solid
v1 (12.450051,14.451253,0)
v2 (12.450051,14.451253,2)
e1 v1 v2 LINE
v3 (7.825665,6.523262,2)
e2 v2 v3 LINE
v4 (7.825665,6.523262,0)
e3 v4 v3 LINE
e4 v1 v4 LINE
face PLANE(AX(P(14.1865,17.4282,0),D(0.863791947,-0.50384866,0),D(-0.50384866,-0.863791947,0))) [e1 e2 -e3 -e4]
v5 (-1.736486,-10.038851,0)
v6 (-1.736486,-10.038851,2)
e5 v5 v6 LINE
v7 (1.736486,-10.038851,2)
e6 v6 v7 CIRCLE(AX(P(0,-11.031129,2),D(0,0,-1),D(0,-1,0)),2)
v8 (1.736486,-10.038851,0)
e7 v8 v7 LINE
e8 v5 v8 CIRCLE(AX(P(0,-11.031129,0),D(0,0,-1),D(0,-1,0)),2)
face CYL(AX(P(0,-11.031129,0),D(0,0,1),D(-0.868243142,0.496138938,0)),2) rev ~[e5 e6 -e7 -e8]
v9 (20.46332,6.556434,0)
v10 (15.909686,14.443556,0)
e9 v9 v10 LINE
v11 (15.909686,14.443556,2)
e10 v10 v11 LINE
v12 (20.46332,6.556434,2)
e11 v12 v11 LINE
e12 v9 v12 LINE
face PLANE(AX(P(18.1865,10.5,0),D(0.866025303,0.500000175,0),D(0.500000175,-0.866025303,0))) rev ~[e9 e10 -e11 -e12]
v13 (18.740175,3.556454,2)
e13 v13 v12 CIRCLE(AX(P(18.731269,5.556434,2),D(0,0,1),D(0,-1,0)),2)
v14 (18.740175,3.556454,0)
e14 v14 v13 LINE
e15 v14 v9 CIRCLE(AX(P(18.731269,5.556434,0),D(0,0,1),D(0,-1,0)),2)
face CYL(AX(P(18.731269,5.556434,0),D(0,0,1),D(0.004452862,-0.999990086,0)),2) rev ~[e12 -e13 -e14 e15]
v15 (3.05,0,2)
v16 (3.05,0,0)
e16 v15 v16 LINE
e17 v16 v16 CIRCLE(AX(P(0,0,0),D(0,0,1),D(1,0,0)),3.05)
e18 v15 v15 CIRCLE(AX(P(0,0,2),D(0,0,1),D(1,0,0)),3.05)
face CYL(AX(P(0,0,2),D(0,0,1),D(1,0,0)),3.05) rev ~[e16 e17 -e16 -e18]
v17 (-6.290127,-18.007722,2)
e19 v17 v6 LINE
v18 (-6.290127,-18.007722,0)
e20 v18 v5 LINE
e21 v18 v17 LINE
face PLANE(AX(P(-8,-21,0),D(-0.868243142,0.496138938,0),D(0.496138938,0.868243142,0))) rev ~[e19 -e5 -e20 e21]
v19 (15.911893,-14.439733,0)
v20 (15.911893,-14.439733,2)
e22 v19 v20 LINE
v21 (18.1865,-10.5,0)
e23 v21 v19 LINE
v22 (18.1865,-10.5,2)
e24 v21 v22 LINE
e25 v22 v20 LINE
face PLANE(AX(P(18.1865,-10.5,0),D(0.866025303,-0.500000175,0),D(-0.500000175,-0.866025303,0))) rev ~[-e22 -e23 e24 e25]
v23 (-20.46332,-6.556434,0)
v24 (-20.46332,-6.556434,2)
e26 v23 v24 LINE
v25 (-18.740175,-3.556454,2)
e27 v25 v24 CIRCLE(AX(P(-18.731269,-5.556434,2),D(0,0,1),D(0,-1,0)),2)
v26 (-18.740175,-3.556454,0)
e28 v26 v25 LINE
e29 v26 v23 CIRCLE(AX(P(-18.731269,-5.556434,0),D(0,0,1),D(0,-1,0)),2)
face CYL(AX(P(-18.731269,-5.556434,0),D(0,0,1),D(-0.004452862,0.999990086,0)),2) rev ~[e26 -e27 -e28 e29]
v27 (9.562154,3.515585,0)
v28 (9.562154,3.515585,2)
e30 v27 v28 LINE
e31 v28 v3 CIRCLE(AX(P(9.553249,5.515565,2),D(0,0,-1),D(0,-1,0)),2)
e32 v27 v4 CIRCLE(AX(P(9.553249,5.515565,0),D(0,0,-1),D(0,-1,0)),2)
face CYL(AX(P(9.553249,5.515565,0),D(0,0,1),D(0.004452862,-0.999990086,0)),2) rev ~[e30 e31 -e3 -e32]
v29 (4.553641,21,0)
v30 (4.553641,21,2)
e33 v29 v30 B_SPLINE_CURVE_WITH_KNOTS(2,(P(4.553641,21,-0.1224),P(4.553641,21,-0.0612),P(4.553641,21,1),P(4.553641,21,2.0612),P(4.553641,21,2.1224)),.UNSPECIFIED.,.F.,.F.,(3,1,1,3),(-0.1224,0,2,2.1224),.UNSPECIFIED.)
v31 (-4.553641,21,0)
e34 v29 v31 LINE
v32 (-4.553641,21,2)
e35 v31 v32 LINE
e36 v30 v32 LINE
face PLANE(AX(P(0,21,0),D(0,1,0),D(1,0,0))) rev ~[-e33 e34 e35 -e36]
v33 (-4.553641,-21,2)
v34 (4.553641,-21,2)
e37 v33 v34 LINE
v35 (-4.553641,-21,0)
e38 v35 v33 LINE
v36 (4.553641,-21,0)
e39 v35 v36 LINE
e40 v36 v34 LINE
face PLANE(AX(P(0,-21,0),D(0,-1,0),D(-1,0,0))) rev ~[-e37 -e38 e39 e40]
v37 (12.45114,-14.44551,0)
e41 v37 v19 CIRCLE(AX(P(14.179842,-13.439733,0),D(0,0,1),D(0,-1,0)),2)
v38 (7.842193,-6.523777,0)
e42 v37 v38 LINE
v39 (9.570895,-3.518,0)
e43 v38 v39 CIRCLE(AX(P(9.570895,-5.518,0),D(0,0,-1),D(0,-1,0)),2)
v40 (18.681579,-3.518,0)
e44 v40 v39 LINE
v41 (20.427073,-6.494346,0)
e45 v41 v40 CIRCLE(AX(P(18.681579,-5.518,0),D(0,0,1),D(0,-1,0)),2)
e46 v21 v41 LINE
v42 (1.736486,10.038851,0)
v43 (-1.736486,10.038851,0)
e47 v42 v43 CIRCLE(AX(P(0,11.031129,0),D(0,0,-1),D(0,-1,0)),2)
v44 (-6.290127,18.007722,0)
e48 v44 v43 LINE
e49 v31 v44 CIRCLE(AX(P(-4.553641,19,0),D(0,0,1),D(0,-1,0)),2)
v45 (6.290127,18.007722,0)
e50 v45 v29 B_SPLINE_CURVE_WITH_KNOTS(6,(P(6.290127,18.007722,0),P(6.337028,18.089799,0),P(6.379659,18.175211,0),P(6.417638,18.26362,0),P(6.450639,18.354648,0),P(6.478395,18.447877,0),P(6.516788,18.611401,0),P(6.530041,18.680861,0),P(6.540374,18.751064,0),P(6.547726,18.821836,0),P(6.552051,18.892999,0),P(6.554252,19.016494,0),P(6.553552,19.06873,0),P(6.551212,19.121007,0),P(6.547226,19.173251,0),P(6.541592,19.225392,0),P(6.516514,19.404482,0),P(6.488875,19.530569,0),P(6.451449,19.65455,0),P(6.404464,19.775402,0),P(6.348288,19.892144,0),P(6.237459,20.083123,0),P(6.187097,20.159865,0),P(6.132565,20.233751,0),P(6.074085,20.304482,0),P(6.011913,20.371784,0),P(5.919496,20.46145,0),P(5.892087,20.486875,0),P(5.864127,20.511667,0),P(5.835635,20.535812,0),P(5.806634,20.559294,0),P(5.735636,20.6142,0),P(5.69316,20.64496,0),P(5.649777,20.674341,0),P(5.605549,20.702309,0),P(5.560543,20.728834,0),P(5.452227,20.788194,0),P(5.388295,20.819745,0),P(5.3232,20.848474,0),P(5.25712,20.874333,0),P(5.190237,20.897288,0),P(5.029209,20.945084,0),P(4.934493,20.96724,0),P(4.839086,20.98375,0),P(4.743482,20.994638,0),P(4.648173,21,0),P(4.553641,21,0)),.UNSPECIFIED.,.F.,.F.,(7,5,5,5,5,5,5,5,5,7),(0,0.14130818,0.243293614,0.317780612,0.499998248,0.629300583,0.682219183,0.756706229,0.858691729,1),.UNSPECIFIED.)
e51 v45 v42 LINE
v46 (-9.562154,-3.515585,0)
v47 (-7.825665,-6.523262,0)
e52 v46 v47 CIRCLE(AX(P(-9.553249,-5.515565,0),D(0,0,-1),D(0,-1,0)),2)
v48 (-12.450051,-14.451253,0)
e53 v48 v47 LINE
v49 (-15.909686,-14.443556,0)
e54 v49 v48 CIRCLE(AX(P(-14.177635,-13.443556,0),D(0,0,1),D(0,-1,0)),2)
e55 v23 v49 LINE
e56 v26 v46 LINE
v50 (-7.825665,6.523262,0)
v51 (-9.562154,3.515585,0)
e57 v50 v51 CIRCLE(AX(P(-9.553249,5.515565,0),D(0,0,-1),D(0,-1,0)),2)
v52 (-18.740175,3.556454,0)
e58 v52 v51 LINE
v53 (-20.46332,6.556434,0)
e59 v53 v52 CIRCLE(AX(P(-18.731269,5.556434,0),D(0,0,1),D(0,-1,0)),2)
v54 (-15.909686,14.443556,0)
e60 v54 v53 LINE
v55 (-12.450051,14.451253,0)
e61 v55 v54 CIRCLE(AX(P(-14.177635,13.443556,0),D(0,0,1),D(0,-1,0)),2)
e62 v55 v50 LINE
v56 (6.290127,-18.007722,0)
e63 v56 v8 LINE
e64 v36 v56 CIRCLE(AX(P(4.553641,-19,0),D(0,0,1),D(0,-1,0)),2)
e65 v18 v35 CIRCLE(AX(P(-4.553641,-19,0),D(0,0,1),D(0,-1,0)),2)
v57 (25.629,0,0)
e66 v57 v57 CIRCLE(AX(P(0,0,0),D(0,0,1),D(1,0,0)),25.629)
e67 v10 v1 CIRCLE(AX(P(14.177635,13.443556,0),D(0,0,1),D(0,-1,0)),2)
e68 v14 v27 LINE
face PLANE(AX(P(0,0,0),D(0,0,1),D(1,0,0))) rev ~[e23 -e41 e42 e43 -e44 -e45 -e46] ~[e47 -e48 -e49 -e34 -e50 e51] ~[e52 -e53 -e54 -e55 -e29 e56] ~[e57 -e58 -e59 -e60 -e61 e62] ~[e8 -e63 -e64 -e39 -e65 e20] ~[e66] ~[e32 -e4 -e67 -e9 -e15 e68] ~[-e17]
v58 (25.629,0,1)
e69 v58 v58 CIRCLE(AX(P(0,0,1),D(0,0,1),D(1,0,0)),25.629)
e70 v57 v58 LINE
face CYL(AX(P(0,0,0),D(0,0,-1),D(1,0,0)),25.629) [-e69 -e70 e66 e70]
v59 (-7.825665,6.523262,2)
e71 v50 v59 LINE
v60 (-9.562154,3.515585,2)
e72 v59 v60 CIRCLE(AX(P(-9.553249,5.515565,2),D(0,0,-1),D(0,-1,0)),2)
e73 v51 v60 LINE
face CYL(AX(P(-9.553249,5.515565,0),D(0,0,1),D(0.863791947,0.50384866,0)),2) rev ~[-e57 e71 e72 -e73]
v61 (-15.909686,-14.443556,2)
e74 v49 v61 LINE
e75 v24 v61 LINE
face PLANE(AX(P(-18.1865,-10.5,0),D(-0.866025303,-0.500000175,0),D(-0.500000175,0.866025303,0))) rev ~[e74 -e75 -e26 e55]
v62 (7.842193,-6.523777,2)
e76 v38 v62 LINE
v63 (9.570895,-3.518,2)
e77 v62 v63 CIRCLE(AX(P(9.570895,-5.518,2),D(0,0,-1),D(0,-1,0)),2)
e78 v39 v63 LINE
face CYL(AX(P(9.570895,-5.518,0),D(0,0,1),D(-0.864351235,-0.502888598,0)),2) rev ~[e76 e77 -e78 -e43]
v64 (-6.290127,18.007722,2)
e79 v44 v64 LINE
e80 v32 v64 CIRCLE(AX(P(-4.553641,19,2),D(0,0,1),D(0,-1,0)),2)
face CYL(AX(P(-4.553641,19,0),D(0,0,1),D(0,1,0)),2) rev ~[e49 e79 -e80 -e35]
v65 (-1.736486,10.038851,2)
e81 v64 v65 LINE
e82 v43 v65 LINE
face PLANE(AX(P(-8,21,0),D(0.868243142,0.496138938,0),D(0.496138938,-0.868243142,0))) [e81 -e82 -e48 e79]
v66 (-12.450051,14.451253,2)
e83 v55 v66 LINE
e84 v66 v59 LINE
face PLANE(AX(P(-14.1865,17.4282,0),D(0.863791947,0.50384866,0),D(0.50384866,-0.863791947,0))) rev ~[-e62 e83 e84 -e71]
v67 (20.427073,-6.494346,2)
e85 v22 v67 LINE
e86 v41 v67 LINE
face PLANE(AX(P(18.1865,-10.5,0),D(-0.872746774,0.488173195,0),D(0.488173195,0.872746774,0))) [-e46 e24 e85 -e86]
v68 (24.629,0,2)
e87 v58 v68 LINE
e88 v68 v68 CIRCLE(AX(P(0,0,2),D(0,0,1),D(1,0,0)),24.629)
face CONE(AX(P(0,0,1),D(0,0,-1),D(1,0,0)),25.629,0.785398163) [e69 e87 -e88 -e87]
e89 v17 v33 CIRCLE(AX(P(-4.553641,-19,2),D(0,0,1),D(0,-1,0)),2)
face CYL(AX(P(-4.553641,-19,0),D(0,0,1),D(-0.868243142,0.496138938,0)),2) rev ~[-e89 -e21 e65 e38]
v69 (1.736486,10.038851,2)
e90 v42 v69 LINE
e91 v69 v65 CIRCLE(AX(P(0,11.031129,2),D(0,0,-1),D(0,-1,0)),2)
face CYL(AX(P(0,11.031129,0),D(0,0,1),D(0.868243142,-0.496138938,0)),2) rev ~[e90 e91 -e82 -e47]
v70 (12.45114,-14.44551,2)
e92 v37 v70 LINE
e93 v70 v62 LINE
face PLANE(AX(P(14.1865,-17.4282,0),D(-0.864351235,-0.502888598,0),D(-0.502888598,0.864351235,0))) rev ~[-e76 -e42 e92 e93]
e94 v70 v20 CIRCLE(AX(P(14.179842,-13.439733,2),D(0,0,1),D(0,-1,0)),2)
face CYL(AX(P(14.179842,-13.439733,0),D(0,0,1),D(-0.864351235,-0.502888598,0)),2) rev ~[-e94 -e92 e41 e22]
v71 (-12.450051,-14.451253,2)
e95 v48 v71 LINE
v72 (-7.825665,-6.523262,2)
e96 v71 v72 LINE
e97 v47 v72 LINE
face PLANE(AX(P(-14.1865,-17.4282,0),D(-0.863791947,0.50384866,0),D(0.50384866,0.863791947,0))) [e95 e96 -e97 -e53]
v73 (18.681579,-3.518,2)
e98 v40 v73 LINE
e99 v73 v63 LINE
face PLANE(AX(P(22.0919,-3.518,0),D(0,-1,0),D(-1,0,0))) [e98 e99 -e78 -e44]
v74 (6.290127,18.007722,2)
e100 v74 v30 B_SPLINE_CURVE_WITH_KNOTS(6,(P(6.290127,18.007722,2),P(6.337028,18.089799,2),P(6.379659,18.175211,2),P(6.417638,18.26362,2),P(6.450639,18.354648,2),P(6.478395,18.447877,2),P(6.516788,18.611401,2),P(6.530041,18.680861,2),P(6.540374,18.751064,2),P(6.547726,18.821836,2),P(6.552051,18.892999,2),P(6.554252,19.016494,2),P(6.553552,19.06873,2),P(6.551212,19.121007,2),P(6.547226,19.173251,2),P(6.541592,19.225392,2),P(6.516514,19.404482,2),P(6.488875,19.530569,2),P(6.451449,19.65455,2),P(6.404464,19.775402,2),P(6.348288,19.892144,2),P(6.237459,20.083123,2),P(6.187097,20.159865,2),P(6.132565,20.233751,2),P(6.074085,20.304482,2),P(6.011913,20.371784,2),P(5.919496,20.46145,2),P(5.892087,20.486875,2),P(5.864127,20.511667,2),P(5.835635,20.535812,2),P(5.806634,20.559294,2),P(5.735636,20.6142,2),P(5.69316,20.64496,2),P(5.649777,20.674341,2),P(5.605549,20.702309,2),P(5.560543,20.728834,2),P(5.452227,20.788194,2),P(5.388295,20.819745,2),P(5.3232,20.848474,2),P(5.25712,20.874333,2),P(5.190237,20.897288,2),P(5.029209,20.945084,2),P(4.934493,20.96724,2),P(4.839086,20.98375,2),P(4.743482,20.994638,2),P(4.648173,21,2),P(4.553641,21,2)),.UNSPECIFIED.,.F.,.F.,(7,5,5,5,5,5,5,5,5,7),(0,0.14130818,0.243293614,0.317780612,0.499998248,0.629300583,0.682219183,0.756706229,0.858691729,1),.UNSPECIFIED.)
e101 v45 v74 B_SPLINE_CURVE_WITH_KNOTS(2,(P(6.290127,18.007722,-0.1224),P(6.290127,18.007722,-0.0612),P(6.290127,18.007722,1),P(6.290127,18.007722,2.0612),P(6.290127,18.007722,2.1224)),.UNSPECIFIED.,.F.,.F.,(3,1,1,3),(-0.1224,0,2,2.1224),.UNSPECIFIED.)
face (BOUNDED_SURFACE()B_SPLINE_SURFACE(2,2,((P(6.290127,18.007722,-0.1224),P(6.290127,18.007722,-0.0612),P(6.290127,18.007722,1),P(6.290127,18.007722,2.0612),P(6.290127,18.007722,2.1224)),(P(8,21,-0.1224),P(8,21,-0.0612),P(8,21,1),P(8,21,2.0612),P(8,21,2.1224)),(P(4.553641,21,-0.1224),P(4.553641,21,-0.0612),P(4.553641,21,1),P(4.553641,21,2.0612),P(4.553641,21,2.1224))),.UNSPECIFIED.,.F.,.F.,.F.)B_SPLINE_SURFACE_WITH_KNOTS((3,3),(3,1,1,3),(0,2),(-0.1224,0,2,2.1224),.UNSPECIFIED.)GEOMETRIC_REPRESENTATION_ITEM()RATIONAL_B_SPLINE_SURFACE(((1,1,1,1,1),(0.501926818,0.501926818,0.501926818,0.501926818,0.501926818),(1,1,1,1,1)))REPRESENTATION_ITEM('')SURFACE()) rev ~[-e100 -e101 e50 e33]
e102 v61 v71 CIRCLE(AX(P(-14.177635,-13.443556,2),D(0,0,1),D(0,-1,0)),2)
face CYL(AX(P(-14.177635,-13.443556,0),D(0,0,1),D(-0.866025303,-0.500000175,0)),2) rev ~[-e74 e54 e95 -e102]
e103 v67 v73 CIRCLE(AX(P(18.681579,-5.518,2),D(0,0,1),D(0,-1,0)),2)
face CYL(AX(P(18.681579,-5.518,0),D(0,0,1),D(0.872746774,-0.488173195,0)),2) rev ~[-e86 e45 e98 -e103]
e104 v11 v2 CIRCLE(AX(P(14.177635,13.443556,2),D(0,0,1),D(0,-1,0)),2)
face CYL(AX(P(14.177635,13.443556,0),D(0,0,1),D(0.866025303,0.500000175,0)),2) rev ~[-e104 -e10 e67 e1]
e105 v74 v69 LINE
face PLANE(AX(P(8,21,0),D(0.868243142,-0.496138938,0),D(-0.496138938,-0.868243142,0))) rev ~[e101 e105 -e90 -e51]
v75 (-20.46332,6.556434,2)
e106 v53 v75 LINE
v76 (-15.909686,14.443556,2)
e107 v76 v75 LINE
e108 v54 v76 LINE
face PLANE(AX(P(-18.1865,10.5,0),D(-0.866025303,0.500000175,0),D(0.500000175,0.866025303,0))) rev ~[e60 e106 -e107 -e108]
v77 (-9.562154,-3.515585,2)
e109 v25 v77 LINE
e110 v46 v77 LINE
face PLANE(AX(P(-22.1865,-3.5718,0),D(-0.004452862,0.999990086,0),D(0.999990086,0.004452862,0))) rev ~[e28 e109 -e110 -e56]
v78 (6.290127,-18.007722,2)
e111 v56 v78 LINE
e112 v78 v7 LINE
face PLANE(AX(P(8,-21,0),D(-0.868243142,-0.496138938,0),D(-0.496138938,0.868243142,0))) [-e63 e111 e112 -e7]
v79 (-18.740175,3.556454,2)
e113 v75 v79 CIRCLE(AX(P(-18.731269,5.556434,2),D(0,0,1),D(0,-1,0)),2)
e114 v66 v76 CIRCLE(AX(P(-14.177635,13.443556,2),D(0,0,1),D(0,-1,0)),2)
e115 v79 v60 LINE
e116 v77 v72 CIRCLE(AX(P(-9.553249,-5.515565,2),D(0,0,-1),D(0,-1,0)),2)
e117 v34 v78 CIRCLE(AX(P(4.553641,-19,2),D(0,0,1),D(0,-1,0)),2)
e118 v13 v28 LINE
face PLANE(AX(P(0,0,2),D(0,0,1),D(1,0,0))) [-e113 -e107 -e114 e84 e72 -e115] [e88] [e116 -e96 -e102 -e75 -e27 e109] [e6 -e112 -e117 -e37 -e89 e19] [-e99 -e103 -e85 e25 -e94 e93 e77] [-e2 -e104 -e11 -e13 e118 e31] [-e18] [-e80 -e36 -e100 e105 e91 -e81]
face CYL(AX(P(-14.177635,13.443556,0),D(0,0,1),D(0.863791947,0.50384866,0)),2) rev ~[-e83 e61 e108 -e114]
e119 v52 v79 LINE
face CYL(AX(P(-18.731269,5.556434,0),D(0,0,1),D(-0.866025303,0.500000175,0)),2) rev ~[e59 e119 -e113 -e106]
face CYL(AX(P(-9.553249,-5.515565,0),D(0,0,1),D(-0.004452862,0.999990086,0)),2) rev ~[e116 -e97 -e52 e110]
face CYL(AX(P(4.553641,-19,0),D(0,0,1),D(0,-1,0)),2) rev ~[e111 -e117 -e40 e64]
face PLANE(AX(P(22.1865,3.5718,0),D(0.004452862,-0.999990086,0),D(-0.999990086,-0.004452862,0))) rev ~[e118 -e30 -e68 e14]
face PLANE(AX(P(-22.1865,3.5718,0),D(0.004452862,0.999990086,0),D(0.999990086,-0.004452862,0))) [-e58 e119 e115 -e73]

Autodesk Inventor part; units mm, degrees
sketch "Sketch1" plane through (0, 0, 0) normal (0, 0, 1) x (1, 0, 0)
  line L0 (0, 2.8582) -> (0, -2.8582) construction
  line L1 (-5.7775, 0) -> (5.7775, 0) construction
  circle A0 centre (0, 0) radius 25.629
  circle A1 centre (0, 0) radius 4
  line L2 (0, 4) -> (0, 7)
  line L3 (0, 7) -> (0, 21)
  line L4 (0, 21) -> (5, 21)
  line L5 (5, 21) -> (8, 21)
  line L6 (8, 21) -> (0, 7)
  line L7 (0, 21) -> (-8, 21)
  line L8 (-8, 21) -> (0, 7)
  line L9 (0, -4) -> (0, -7)
  line L10 (0, -7) -> (0, -21)
  line L11 (0, -21) -> (8, -21)
  line L12 (8, -21) -> (0, -7)
  line L13 (0, -21) -> (-8, -21)
  line L14 (-8, -21) -> (0, -7)
  line L15 (0, 0) -> (2.5981, 1.5)
  line L16 (0, 0) -> (3, 0) construction
  line L17 (2.5981, 1.5) -> (3.4641, 2)
  line L18 (3.4641, 2) -> (6.0622, 3.5)
  line L19 (6.0622, 3.5) -> (18.1865, 10.5)
  line L20 (18.1865, 10.5) -> (14.1865, 17.4282)
  line L21 (14.1865, 17.4282) -> (6.0622, 3.5)
  line L22 (18.1865, 10.5) -> (22.1865, 3.5718)
  line L23 (22.1865, 3.5718) -> (6.0622, 3.5)
  line L24 (0, 0) -> (8, 0) construction
  line L25 (0, 0) -> (3.4641, -2)
  line L26 (0, 0) -> (4, 0) construction
  line L27 (3.4641, -2) -> (6.0622, -3.5)
  line L28 (6.0622, -3.5) -> (18.1865, -10.5)
  line L29 (18.1865, -10.5) -> (14.1865, -17.4282)
  line L30 (14.1865, -17.4282) -> (6.0934, -3.518)
  line L31 (18.1865, -10.5) -> (22.0919, -3.518)
  line L32 (22.0919, -3.518) -> (6.0934, -3.518)
  line L33 (0, 0) -> (-2.5981, 1.5)
  line L34 (0, 0) -> (3, 0) construction
  line L35 (-2.5981, 1.5) -> (-3.4641, 2)
  line L36 (-3.4641, 2) -> (-6.0622, 3.5)
  line L37 (-6.0622, 3.5) -> (-18.1865, 10.5)
  line L38 (-18.1865, 10.5) -> (-14.1865, 17.4282)
  line L39 (-14.1865, 17.4282) -> (-6.0622, 3.5)
  line L40 (-18.1865, 10.5) -> (-22.1865, 3.5718)
  line L41 (-22.1865, 3.5718) -> (-6.0622, 3.5)
  line L42 (0, 0) -> (-6.0622, -3.5)
  line L43 (0, 0) -> (7, 0) construction
  line L44 (-6.0622, -3.5) -> (-18.1865, -10.5)
  line L45 (-18.1865, -10.5) -> (-14.1865, -17.4282)
  line L46 (-14.1865, -17.4282) -> (-6.0622, -3.5)
  line L47 (-18.1865, -10.5) -> (-22.1865, -3.5718)
  line L48 (-22.1865, -3.5718) -> (-6.0622, -3.5)
  dimension "d0" = 51.258
  dimension "d1" = 8
  dimension "d2" = 3
  dimension "d3" = 14
  dimension "d4" = 5
  dimension "d5" = 3
  dimension "d6" = 8
  dimension "d7" = 3
  dimension "d8" = 14
  dimension "d9" = 8
  dimension "d10" = 8
  dimension "d11" = 3
  dimension "d12" = 30
  dimension "d13" = 3
  dimension "d14" = 14
  dimension "d15" = 8
  dimension "d16" = 8
  dimension "d19" = 4
  dimension "d20" = 30
  dimension "d21" = 3
  dimension "d22" = 14
  dimension "d23" = 8
  dimension "d24" = 8
  dimension "d25" = 3
  dimension "d26" = 150
  dimension "d27" = 1
  dimension "d28" = 180
  dimension "d29" = 3
  dimension "d30" = 180
  dimension "d31" = 180
  dimension "d32" = 8
  dimension "d33" = 8
  dimension "d34" = 7
  dimension "d35" = 150
  dimension "d36" = 14
  dimension "d37" = 180
  dimension "d38" = 8
  dimension "d39" = 8
extrude "Extrusion1" add sketch "Sketch1" along normal blind 2
fillet "Fillet1" radius 2 18 edges at (14.1865, 17.4282, 1) (22.1865, 3.5718, 1) (6.0622, 3.5, 1) (22.0919, -3.518, 1) (14.1865, -17.4282, 1) (6.0934, -3.518, 1) (0, 7, 1) (-8, 21, 1) (8, 21, 1) (-6.0622, 3.5, 1) (-22.1865, 3.5718, 1) (-14.1865, 17.4282, 1) (-6.0622, -3.5, 1) (-14.1865, -17.4282, 1) (-22.1865, -3.5718, 1) (-8, -21, 1) (0, -7, 1) (8, -21, 1)
sketch "Sketch2" plane through (0, 0, 2) normal (0, 0, 1) x (1, 0, 0)
  circle A0 centre (0, 0) radius 3.05
  circle A1 centre (0, 0) radius 5
  dimension "d43" = 6.1
  dimension "d49" = 10
extrude "Extrusion2" add sketch "Sketch2" against normal blind 2
chamfer "Chamfer1" distance 1 angle 45 1 edges at (-25.629, 0, 2)
properties part number "Wiel hout" material "S235"
